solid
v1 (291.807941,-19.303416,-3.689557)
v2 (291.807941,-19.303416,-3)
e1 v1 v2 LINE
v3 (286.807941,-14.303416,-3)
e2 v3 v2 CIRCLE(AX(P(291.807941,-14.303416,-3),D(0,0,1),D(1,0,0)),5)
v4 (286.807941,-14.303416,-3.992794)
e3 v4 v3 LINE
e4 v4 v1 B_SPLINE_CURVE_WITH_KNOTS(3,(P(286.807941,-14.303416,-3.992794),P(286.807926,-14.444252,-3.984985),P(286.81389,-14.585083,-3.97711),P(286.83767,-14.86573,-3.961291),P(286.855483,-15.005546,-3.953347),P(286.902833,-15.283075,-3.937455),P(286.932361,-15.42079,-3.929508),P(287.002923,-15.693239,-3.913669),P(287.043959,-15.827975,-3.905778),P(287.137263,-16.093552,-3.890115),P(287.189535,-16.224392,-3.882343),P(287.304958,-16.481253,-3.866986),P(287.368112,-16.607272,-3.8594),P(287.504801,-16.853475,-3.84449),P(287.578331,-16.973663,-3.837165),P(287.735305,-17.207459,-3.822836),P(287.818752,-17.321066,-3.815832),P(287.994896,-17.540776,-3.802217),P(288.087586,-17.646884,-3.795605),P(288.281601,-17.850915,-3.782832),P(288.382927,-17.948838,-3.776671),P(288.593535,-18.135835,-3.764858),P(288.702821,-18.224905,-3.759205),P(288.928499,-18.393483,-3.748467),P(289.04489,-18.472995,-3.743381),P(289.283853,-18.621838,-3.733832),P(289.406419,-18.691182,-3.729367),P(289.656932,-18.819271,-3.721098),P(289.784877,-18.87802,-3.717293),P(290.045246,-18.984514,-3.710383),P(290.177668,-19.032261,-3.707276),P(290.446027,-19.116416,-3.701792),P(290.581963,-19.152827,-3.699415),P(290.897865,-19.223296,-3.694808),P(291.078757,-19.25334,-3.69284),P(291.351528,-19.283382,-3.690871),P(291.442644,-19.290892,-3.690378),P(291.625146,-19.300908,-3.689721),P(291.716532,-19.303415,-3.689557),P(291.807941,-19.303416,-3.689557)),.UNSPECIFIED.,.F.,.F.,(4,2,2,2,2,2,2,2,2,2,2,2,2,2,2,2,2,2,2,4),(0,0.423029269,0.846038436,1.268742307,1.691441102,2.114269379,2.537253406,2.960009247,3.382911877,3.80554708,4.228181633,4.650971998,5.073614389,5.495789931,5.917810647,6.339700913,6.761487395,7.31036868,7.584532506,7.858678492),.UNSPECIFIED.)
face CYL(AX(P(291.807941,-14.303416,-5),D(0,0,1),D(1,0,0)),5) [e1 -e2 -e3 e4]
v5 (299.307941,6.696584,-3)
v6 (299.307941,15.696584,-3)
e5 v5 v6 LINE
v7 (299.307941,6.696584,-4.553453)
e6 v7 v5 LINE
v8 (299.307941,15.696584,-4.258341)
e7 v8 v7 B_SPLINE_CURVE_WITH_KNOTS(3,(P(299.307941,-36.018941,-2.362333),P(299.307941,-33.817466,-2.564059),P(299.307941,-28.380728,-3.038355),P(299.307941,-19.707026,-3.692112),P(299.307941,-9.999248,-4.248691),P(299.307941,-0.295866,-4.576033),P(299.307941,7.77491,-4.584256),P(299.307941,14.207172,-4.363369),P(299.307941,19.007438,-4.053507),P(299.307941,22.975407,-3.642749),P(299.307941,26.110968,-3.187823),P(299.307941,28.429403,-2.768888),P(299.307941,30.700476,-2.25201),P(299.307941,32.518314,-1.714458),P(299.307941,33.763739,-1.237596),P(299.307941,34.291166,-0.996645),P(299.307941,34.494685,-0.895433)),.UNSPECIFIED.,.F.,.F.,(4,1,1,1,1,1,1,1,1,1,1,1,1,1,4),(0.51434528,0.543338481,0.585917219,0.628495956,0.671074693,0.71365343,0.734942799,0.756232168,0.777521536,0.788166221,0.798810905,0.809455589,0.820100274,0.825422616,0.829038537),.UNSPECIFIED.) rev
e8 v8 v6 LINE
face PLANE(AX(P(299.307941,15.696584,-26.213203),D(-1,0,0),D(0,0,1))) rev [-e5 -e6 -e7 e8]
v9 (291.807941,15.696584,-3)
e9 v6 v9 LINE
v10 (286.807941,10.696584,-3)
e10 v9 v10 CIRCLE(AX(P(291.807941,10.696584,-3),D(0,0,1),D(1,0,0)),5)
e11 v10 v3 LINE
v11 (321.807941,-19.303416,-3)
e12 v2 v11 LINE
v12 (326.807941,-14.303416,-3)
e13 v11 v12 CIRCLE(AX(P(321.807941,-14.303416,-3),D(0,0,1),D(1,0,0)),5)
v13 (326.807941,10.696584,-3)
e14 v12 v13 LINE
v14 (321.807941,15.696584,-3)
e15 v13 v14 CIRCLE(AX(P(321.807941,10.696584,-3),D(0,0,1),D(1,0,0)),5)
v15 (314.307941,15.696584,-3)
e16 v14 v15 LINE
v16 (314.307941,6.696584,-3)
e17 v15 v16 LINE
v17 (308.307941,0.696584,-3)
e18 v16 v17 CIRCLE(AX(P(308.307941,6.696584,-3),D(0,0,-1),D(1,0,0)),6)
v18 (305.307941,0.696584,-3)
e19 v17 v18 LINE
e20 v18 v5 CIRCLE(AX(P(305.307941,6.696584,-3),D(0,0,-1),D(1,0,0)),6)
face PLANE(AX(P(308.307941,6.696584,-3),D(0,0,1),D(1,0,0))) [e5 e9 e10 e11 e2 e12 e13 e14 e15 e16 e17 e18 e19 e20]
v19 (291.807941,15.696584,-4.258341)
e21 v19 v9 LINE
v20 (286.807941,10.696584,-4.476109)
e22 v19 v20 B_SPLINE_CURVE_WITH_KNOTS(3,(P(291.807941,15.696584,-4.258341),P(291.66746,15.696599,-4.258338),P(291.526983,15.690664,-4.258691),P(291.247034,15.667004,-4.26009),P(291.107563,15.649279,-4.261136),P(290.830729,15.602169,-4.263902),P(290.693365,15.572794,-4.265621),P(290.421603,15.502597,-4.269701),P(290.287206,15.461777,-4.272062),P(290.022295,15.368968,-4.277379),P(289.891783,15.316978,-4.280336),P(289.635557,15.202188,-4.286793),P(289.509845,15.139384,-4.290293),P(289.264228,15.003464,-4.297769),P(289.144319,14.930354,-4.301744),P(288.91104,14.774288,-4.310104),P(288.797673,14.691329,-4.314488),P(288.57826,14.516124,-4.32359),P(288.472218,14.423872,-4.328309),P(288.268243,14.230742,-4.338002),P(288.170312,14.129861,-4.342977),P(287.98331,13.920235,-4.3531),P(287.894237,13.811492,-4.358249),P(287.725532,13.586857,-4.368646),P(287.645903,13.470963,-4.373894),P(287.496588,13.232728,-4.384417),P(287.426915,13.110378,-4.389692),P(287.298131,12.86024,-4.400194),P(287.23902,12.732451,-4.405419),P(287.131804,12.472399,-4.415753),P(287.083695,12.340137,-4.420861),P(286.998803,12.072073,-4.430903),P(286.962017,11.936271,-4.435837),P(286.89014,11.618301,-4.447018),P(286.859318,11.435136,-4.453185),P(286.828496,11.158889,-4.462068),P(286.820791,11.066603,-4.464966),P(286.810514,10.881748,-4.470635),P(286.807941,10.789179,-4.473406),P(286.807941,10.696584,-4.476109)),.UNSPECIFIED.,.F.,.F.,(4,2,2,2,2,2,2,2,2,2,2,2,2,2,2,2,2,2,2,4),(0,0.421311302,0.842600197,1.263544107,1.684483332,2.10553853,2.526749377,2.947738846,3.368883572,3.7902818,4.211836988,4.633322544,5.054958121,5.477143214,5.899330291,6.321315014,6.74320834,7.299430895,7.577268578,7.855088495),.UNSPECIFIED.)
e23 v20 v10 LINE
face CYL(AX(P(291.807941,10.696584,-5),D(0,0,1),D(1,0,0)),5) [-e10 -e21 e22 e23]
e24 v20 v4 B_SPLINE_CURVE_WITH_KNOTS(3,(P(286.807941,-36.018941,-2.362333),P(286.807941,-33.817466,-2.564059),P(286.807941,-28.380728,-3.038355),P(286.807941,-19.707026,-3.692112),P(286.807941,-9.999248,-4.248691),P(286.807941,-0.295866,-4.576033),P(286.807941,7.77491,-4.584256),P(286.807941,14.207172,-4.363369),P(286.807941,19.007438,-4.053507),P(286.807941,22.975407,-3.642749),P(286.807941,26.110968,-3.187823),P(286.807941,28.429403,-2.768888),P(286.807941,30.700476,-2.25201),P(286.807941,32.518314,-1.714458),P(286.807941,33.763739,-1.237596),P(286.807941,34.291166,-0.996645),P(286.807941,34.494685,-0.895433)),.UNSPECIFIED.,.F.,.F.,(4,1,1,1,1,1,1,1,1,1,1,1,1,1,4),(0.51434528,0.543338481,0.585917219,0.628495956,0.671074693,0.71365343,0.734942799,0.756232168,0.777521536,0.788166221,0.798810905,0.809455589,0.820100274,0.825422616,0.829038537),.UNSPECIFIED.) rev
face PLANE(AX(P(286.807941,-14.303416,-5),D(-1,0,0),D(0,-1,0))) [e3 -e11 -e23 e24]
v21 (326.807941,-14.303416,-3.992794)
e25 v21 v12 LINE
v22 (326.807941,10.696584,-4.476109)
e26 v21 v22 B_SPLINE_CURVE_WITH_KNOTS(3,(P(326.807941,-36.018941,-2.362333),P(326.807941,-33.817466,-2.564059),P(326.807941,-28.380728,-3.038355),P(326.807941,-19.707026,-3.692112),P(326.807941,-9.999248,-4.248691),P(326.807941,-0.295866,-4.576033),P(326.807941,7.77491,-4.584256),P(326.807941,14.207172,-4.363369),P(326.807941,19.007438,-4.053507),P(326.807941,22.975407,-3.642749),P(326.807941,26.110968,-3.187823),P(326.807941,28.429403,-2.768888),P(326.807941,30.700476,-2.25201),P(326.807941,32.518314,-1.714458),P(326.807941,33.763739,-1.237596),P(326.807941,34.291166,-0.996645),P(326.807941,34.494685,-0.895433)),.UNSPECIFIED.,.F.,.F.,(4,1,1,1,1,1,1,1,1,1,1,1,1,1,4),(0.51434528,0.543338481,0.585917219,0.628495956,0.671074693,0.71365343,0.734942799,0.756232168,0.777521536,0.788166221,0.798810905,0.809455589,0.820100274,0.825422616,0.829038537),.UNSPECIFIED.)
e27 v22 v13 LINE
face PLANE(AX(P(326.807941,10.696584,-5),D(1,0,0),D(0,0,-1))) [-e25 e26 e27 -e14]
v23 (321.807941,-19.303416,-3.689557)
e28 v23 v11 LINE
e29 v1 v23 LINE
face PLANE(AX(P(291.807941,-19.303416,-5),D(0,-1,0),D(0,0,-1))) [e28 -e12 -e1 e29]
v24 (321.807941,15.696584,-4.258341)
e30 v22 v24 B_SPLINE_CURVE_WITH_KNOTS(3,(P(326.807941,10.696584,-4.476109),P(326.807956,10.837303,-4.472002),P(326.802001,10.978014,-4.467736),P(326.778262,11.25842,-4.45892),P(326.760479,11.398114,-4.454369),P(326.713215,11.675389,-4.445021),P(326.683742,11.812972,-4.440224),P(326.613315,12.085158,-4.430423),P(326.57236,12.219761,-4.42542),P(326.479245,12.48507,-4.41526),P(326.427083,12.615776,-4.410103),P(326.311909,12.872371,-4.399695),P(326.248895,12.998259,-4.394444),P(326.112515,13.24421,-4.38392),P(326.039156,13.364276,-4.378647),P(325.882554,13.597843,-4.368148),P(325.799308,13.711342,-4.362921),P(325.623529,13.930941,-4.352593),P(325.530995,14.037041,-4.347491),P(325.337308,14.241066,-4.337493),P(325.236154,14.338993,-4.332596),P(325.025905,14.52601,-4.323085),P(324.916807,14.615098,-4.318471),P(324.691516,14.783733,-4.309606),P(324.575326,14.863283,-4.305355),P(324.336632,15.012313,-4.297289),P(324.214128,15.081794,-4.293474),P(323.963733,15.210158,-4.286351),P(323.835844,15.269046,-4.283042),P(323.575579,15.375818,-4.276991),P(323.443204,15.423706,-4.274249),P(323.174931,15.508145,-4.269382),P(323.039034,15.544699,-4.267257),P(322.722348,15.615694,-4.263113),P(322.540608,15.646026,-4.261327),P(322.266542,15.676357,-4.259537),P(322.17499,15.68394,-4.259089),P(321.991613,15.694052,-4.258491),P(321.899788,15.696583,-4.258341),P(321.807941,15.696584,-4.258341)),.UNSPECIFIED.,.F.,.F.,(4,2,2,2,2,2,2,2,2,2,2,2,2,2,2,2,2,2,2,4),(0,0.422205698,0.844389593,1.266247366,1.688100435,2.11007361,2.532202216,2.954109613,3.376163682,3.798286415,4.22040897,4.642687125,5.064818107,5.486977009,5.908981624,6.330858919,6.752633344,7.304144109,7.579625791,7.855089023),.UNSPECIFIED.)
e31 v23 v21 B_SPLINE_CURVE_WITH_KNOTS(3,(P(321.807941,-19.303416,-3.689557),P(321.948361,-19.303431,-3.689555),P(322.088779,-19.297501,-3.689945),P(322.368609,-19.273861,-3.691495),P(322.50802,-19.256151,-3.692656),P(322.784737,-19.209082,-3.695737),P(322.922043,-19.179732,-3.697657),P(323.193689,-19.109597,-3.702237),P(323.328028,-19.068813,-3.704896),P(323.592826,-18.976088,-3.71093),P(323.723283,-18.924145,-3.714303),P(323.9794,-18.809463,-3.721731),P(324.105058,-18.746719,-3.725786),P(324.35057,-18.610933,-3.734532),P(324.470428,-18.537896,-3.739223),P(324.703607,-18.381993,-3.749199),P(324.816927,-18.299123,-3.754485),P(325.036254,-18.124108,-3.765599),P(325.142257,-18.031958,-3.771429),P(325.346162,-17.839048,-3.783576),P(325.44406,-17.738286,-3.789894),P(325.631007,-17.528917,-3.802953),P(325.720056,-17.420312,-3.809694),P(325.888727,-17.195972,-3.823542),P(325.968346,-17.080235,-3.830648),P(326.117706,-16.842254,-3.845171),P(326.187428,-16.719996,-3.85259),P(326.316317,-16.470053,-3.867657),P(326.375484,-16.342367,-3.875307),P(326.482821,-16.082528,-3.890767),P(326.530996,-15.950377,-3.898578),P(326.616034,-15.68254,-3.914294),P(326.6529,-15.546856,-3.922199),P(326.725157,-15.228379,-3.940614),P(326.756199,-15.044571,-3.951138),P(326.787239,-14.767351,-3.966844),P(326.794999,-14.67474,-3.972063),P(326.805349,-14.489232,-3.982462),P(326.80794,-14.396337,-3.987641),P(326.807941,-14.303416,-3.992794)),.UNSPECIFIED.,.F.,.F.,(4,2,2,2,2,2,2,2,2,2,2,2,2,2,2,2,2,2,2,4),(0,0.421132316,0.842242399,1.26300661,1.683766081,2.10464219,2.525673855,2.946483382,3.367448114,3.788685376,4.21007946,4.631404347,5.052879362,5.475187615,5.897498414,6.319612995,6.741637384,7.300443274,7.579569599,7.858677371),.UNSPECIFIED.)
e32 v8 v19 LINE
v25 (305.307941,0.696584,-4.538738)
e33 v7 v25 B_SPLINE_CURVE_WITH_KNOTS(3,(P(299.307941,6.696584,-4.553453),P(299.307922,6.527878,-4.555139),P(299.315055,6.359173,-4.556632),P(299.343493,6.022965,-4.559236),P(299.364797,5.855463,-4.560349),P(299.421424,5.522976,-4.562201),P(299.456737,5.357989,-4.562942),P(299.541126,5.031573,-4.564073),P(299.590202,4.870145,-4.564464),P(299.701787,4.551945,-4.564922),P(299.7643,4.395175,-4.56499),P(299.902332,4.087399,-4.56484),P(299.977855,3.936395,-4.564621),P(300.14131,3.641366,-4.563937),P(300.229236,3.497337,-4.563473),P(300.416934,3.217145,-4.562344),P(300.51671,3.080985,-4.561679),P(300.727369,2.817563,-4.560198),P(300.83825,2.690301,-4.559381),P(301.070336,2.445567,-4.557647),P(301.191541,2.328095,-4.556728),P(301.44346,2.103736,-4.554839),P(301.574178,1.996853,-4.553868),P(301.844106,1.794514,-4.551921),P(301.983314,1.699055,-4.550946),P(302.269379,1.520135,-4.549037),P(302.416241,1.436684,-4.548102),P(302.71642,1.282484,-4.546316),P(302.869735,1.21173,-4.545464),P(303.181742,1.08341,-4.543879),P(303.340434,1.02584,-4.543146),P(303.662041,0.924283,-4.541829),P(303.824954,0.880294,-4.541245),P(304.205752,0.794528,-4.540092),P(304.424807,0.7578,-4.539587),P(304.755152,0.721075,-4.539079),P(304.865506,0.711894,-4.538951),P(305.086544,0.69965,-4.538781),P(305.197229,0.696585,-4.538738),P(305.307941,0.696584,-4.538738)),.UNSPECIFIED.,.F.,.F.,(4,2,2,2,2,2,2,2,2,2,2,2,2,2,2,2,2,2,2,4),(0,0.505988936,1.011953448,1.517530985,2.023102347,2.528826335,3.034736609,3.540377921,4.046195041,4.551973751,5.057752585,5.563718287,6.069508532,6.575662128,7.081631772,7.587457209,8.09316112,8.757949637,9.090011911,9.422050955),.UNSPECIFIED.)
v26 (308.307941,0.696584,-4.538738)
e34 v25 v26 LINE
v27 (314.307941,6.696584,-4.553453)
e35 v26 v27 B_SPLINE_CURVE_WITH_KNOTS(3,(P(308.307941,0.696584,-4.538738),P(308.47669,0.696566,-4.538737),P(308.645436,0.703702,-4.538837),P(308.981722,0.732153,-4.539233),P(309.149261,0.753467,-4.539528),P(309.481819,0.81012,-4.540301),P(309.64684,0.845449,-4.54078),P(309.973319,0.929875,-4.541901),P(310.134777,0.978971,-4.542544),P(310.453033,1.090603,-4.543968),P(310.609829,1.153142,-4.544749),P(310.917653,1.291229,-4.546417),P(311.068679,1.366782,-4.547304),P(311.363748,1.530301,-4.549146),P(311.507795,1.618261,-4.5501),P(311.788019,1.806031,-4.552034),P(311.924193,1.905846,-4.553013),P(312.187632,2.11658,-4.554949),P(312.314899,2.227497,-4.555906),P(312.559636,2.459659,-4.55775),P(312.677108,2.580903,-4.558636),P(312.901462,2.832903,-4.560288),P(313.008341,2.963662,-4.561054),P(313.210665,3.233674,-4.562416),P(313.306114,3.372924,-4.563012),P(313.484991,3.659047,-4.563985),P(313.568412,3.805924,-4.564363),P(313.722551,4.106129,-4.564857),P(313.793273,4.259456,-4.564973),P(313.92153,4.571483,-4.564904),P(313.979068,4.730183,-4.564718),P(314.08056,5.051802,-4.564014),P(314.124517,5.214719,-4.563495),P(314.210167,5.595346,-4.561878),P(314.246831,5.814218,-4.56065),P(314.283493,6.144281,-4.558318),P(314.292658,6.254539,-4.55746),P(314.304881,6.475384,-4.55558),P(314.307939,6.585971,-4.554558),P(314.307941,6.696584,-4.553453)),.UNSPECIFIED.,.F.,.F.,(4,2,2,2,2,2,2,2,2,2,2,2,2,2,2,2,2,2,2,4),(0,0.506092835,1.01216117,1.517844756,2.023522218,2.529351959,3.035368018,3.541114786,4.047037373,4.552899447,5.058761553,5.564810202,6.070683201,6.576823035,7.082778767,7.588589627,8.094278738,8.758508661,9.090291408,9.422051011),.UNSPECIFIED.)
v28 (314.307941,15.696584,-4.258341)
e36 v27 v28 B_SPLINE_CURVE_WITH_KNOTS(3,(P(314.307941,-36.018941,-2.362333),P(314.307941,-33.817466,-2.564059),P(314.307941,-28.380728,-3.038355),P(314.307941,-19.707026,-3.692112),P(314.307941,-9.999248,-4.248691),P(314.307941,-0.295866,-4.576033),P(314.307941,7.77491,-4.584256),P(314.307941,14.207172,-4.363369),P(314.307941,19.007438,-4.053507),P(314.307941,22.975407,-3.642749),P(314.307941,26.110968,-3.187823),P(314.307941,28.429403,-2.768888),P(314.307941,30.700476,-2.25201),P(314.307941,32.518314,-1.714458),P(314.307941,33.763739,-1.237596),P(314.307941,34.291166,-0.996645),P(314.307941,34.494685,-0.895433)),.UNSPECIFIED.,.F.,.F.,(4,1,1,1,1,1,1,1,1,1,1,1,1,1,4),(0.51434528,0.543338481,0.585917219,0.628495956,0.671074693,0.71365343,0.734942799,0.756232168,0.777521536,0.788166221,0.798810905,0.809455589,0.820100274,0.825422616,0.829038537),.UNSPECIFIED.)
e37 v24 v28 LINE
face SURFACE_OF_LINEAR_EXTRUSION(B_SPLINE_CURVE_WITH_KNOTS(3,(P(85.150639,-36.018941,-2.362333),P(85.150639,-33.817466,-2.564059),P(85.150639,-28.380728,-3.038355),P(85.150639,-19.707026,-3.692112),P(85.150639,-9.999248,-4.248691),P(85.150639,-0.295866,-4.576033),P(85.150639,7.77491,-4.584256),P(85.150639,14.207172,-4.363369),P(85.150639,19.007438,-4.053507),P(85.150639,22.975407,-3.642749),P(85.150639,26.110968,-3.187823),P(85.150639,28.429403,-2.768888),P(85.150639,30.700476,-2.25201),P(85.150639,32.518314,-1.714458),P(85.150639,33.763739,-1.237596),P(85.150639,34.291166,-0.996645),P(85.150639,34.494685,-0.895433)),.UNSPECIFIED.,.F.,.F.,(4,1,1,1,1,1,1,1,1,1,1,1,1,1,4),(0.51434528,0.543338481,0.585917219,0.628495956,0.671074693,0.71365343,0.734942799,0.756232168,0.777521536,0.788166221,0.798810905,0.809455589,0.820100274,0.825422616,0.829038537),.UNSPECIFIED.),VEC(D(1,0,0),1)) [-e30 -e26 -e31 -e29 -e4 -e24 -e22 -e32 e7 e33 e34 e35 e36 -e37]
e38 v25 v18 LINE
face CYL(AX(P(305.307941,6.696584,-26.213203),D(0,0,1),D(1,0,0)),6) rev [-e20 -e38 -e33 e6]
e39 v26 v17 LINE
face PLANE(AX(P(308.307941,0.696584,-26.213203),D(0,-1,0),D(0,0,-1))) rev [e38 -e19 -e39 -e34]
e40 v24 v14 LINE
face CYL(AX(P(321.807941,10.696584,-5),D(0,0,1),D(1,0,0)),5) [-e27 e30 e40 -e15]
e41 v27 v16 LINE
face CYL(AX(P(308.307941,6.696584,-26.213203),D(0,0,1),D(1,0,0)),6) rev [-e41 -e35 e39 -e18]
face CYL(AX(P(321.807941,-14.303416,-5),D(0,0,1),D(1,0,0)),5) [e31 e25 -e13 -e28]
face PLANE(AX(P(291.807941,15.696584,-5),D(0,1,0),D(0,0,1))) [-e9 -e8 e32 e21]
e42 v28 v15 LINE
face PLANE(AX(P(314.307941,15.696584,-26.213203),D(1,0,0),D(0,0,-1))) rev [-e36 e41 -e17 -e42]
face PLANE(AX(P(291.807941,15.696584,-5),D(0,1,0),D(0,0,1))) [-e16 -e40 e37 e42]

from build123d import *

# Parameters (mm, degrees)
BOSS_EXTRUDE1_DEPTH = 5
CUT_EXTRUDE1_DEPTH  = 5
CAVITY1_START       = 286.807940561
CAVITY1_DEPTH       = 40
CUT_EXTRUDE2_DEPTH  = 3


# Read off the part's stored shape, not the designer's step: Cavity1
with BuildPart() as part:
    # Sketch1 → Boss-Extrude1 (new body)
    with BuildSketch(Plane.XY):
        with BuildLine():
            Line((326.807940561, 10.696584157), (326.807940561, -14.303415843))
            ThreePointArc((326.807940561, -14.303415843), (325.343474467, -17.838949749), (321.807940561, -19.303415843))
            Line((321.807940561, -19.303415843), (291.807940561, -19.303415843))
            ThreePointArc((291.807940561, -19.303415843), (288.272406655, -17.838949749), (286.807940561, -14.303415843))
            Line((286.807940561, -14.303415843), (286.807940561, 10.696584157))
            ThreePointArc((286.807940561, 10.696584157), (287.241237169, 12.732565524), (288.466028612, 14.415673363))
            ThreePointArc((288.466028612, 14.415673363), (290.018449856, 15.365387324), (291.807940561, 15.696584157))
            Line((291.807940561, 15.696584157), (321.807940561, 15.696584157))
            ThreePointArc((321.807940561, 15.696584157), (323.597431267, 15.365387324), (325.14985251, 14.415673363))
            ThreePointArc((325.14985251, 14.415673363), (326.374643954, 12.732565524), (326.807940561, 10.696584157))
        make_face()
    extrude(amount=-BOSS_EXTRUDE1_DEPTH)

    # Sketch2 → Cut-Extrude1 (cut)
    with BuildSketch(Plane.XY):
        with BuildLine():
            Line((314.307940561, 15.696584157), (299.307940561, 15.696584157))
            Line((299.307940561, 15.696584157), (299.307940561, 6.696584157))
            ThreePointArc((299.307940561, 6.696584157), (301.065299874, 2.45394347), (305.307940561, 0.696584157))
            Line((305.307940561, 0.696584157), (308.307940561, 0.696584157))
            ThreePointArc((308.307940561, 0.696584157), (312.550581249, 2.45394347), (314.307940561, 6.696584157))
            Line((314.307940561, 6.696584157), (314.307940561, 15.696584157))
        make_face()
    extrude(amount=-CUT_EXTRUDE1_DEPTH, mode=Mode.SUBTRACT)

    # Cavity1 outline → Cavity1 (cut)
    with BuildSketch(Plane.YZ.offset(CAVITY1_START)):
        with BuildLine():
            add(Edge.make_bspline(
                [(-19.303419089, -3.689556548), (-16.202204445, -3.892989258), (-9.864860791, -4.253224972), (-0.295866357, -4.576033421), (7.774910047, -4.584255677), (13.098555958, -4.40143973), (15.199220063, -4.287786884), (15.696587408, -4.2583405)],
                knots=[0.587686308, 0.587686308, 0.587686308, 0.587686308, 0.628495956, 0.671074693, 0.71365343, 0.734942799, 0.741555068, 0.741555068, 0.741555068, 0.741555068], degree=3))
            Line((-19.303419089, -3.689556548), (-19.303415843, -5))
            Line((-19.303415843, -5), (15.696584157, -5))
            Line((15.696584157, -5), (15.696587408, -4.2583405))
        make_face()
    extrude(amount=CAVITY1_DEPTH, mode=Mode.SUBTRACT)

    # Sketch3 → Cut-Extrude2 (cut)
    with BuildSketch(Plane.XY):
        with BuildLine():
            Line((314.307940561, 15.696584157), (314.307940561, 6.696584157))
            ThreePointArc((314.307940561, 6.696584157), (312.550581249, 2.45394347), (308.307940561, 0.696584157))
            Line((308.307940561, 0.696584157), (305.307940561, 0.696584157))
            ThreePointArc((305.307940561, 0.696584157), (301.065299874, 2.45394347), (299.307940561, 6.696584157))
            Line((299.307940561, 6.696584157), (299.307940561, 15.696584157))
            Line((299.307940561, 15.696584157), (291.807940561, 15.696584157))
            ThreePointArc((291.807940561, 15.696584157), (288.272406655, 14.232118063), (286.807940561, 10.696584157))
            Line((286.807940561, 10.696584157), (286.807940561, -14.303415843))
            ThreePointArc((286.807940561, -14.303415843), (288.272406655, -17.838949749), (291.807940561, -19.303415843))
            Line((291.807940561, -19.303415843), (321.807940561, -19.303415843))
            ThreePointArc((321.807940561, -19.303415843), (325.343474467, -17.838949749), (326.807940561, -14.303415843))
            Line((326.807940561, -14.303415843), (326.807940561, 10.696584157))
            ThreePointArc((326.807940561, 10.696584157), (325.343474467, 14.232118063), (321.807940561, 15.696584157))
            Line((321.807940561, 15.696584157), (314.307940561, 15.696584157))
        make_face()
    extrude(amount=-CUT_EXTRUDE2_DEPTH, mode=Mode.SUBTRACT)


solid = part.part
